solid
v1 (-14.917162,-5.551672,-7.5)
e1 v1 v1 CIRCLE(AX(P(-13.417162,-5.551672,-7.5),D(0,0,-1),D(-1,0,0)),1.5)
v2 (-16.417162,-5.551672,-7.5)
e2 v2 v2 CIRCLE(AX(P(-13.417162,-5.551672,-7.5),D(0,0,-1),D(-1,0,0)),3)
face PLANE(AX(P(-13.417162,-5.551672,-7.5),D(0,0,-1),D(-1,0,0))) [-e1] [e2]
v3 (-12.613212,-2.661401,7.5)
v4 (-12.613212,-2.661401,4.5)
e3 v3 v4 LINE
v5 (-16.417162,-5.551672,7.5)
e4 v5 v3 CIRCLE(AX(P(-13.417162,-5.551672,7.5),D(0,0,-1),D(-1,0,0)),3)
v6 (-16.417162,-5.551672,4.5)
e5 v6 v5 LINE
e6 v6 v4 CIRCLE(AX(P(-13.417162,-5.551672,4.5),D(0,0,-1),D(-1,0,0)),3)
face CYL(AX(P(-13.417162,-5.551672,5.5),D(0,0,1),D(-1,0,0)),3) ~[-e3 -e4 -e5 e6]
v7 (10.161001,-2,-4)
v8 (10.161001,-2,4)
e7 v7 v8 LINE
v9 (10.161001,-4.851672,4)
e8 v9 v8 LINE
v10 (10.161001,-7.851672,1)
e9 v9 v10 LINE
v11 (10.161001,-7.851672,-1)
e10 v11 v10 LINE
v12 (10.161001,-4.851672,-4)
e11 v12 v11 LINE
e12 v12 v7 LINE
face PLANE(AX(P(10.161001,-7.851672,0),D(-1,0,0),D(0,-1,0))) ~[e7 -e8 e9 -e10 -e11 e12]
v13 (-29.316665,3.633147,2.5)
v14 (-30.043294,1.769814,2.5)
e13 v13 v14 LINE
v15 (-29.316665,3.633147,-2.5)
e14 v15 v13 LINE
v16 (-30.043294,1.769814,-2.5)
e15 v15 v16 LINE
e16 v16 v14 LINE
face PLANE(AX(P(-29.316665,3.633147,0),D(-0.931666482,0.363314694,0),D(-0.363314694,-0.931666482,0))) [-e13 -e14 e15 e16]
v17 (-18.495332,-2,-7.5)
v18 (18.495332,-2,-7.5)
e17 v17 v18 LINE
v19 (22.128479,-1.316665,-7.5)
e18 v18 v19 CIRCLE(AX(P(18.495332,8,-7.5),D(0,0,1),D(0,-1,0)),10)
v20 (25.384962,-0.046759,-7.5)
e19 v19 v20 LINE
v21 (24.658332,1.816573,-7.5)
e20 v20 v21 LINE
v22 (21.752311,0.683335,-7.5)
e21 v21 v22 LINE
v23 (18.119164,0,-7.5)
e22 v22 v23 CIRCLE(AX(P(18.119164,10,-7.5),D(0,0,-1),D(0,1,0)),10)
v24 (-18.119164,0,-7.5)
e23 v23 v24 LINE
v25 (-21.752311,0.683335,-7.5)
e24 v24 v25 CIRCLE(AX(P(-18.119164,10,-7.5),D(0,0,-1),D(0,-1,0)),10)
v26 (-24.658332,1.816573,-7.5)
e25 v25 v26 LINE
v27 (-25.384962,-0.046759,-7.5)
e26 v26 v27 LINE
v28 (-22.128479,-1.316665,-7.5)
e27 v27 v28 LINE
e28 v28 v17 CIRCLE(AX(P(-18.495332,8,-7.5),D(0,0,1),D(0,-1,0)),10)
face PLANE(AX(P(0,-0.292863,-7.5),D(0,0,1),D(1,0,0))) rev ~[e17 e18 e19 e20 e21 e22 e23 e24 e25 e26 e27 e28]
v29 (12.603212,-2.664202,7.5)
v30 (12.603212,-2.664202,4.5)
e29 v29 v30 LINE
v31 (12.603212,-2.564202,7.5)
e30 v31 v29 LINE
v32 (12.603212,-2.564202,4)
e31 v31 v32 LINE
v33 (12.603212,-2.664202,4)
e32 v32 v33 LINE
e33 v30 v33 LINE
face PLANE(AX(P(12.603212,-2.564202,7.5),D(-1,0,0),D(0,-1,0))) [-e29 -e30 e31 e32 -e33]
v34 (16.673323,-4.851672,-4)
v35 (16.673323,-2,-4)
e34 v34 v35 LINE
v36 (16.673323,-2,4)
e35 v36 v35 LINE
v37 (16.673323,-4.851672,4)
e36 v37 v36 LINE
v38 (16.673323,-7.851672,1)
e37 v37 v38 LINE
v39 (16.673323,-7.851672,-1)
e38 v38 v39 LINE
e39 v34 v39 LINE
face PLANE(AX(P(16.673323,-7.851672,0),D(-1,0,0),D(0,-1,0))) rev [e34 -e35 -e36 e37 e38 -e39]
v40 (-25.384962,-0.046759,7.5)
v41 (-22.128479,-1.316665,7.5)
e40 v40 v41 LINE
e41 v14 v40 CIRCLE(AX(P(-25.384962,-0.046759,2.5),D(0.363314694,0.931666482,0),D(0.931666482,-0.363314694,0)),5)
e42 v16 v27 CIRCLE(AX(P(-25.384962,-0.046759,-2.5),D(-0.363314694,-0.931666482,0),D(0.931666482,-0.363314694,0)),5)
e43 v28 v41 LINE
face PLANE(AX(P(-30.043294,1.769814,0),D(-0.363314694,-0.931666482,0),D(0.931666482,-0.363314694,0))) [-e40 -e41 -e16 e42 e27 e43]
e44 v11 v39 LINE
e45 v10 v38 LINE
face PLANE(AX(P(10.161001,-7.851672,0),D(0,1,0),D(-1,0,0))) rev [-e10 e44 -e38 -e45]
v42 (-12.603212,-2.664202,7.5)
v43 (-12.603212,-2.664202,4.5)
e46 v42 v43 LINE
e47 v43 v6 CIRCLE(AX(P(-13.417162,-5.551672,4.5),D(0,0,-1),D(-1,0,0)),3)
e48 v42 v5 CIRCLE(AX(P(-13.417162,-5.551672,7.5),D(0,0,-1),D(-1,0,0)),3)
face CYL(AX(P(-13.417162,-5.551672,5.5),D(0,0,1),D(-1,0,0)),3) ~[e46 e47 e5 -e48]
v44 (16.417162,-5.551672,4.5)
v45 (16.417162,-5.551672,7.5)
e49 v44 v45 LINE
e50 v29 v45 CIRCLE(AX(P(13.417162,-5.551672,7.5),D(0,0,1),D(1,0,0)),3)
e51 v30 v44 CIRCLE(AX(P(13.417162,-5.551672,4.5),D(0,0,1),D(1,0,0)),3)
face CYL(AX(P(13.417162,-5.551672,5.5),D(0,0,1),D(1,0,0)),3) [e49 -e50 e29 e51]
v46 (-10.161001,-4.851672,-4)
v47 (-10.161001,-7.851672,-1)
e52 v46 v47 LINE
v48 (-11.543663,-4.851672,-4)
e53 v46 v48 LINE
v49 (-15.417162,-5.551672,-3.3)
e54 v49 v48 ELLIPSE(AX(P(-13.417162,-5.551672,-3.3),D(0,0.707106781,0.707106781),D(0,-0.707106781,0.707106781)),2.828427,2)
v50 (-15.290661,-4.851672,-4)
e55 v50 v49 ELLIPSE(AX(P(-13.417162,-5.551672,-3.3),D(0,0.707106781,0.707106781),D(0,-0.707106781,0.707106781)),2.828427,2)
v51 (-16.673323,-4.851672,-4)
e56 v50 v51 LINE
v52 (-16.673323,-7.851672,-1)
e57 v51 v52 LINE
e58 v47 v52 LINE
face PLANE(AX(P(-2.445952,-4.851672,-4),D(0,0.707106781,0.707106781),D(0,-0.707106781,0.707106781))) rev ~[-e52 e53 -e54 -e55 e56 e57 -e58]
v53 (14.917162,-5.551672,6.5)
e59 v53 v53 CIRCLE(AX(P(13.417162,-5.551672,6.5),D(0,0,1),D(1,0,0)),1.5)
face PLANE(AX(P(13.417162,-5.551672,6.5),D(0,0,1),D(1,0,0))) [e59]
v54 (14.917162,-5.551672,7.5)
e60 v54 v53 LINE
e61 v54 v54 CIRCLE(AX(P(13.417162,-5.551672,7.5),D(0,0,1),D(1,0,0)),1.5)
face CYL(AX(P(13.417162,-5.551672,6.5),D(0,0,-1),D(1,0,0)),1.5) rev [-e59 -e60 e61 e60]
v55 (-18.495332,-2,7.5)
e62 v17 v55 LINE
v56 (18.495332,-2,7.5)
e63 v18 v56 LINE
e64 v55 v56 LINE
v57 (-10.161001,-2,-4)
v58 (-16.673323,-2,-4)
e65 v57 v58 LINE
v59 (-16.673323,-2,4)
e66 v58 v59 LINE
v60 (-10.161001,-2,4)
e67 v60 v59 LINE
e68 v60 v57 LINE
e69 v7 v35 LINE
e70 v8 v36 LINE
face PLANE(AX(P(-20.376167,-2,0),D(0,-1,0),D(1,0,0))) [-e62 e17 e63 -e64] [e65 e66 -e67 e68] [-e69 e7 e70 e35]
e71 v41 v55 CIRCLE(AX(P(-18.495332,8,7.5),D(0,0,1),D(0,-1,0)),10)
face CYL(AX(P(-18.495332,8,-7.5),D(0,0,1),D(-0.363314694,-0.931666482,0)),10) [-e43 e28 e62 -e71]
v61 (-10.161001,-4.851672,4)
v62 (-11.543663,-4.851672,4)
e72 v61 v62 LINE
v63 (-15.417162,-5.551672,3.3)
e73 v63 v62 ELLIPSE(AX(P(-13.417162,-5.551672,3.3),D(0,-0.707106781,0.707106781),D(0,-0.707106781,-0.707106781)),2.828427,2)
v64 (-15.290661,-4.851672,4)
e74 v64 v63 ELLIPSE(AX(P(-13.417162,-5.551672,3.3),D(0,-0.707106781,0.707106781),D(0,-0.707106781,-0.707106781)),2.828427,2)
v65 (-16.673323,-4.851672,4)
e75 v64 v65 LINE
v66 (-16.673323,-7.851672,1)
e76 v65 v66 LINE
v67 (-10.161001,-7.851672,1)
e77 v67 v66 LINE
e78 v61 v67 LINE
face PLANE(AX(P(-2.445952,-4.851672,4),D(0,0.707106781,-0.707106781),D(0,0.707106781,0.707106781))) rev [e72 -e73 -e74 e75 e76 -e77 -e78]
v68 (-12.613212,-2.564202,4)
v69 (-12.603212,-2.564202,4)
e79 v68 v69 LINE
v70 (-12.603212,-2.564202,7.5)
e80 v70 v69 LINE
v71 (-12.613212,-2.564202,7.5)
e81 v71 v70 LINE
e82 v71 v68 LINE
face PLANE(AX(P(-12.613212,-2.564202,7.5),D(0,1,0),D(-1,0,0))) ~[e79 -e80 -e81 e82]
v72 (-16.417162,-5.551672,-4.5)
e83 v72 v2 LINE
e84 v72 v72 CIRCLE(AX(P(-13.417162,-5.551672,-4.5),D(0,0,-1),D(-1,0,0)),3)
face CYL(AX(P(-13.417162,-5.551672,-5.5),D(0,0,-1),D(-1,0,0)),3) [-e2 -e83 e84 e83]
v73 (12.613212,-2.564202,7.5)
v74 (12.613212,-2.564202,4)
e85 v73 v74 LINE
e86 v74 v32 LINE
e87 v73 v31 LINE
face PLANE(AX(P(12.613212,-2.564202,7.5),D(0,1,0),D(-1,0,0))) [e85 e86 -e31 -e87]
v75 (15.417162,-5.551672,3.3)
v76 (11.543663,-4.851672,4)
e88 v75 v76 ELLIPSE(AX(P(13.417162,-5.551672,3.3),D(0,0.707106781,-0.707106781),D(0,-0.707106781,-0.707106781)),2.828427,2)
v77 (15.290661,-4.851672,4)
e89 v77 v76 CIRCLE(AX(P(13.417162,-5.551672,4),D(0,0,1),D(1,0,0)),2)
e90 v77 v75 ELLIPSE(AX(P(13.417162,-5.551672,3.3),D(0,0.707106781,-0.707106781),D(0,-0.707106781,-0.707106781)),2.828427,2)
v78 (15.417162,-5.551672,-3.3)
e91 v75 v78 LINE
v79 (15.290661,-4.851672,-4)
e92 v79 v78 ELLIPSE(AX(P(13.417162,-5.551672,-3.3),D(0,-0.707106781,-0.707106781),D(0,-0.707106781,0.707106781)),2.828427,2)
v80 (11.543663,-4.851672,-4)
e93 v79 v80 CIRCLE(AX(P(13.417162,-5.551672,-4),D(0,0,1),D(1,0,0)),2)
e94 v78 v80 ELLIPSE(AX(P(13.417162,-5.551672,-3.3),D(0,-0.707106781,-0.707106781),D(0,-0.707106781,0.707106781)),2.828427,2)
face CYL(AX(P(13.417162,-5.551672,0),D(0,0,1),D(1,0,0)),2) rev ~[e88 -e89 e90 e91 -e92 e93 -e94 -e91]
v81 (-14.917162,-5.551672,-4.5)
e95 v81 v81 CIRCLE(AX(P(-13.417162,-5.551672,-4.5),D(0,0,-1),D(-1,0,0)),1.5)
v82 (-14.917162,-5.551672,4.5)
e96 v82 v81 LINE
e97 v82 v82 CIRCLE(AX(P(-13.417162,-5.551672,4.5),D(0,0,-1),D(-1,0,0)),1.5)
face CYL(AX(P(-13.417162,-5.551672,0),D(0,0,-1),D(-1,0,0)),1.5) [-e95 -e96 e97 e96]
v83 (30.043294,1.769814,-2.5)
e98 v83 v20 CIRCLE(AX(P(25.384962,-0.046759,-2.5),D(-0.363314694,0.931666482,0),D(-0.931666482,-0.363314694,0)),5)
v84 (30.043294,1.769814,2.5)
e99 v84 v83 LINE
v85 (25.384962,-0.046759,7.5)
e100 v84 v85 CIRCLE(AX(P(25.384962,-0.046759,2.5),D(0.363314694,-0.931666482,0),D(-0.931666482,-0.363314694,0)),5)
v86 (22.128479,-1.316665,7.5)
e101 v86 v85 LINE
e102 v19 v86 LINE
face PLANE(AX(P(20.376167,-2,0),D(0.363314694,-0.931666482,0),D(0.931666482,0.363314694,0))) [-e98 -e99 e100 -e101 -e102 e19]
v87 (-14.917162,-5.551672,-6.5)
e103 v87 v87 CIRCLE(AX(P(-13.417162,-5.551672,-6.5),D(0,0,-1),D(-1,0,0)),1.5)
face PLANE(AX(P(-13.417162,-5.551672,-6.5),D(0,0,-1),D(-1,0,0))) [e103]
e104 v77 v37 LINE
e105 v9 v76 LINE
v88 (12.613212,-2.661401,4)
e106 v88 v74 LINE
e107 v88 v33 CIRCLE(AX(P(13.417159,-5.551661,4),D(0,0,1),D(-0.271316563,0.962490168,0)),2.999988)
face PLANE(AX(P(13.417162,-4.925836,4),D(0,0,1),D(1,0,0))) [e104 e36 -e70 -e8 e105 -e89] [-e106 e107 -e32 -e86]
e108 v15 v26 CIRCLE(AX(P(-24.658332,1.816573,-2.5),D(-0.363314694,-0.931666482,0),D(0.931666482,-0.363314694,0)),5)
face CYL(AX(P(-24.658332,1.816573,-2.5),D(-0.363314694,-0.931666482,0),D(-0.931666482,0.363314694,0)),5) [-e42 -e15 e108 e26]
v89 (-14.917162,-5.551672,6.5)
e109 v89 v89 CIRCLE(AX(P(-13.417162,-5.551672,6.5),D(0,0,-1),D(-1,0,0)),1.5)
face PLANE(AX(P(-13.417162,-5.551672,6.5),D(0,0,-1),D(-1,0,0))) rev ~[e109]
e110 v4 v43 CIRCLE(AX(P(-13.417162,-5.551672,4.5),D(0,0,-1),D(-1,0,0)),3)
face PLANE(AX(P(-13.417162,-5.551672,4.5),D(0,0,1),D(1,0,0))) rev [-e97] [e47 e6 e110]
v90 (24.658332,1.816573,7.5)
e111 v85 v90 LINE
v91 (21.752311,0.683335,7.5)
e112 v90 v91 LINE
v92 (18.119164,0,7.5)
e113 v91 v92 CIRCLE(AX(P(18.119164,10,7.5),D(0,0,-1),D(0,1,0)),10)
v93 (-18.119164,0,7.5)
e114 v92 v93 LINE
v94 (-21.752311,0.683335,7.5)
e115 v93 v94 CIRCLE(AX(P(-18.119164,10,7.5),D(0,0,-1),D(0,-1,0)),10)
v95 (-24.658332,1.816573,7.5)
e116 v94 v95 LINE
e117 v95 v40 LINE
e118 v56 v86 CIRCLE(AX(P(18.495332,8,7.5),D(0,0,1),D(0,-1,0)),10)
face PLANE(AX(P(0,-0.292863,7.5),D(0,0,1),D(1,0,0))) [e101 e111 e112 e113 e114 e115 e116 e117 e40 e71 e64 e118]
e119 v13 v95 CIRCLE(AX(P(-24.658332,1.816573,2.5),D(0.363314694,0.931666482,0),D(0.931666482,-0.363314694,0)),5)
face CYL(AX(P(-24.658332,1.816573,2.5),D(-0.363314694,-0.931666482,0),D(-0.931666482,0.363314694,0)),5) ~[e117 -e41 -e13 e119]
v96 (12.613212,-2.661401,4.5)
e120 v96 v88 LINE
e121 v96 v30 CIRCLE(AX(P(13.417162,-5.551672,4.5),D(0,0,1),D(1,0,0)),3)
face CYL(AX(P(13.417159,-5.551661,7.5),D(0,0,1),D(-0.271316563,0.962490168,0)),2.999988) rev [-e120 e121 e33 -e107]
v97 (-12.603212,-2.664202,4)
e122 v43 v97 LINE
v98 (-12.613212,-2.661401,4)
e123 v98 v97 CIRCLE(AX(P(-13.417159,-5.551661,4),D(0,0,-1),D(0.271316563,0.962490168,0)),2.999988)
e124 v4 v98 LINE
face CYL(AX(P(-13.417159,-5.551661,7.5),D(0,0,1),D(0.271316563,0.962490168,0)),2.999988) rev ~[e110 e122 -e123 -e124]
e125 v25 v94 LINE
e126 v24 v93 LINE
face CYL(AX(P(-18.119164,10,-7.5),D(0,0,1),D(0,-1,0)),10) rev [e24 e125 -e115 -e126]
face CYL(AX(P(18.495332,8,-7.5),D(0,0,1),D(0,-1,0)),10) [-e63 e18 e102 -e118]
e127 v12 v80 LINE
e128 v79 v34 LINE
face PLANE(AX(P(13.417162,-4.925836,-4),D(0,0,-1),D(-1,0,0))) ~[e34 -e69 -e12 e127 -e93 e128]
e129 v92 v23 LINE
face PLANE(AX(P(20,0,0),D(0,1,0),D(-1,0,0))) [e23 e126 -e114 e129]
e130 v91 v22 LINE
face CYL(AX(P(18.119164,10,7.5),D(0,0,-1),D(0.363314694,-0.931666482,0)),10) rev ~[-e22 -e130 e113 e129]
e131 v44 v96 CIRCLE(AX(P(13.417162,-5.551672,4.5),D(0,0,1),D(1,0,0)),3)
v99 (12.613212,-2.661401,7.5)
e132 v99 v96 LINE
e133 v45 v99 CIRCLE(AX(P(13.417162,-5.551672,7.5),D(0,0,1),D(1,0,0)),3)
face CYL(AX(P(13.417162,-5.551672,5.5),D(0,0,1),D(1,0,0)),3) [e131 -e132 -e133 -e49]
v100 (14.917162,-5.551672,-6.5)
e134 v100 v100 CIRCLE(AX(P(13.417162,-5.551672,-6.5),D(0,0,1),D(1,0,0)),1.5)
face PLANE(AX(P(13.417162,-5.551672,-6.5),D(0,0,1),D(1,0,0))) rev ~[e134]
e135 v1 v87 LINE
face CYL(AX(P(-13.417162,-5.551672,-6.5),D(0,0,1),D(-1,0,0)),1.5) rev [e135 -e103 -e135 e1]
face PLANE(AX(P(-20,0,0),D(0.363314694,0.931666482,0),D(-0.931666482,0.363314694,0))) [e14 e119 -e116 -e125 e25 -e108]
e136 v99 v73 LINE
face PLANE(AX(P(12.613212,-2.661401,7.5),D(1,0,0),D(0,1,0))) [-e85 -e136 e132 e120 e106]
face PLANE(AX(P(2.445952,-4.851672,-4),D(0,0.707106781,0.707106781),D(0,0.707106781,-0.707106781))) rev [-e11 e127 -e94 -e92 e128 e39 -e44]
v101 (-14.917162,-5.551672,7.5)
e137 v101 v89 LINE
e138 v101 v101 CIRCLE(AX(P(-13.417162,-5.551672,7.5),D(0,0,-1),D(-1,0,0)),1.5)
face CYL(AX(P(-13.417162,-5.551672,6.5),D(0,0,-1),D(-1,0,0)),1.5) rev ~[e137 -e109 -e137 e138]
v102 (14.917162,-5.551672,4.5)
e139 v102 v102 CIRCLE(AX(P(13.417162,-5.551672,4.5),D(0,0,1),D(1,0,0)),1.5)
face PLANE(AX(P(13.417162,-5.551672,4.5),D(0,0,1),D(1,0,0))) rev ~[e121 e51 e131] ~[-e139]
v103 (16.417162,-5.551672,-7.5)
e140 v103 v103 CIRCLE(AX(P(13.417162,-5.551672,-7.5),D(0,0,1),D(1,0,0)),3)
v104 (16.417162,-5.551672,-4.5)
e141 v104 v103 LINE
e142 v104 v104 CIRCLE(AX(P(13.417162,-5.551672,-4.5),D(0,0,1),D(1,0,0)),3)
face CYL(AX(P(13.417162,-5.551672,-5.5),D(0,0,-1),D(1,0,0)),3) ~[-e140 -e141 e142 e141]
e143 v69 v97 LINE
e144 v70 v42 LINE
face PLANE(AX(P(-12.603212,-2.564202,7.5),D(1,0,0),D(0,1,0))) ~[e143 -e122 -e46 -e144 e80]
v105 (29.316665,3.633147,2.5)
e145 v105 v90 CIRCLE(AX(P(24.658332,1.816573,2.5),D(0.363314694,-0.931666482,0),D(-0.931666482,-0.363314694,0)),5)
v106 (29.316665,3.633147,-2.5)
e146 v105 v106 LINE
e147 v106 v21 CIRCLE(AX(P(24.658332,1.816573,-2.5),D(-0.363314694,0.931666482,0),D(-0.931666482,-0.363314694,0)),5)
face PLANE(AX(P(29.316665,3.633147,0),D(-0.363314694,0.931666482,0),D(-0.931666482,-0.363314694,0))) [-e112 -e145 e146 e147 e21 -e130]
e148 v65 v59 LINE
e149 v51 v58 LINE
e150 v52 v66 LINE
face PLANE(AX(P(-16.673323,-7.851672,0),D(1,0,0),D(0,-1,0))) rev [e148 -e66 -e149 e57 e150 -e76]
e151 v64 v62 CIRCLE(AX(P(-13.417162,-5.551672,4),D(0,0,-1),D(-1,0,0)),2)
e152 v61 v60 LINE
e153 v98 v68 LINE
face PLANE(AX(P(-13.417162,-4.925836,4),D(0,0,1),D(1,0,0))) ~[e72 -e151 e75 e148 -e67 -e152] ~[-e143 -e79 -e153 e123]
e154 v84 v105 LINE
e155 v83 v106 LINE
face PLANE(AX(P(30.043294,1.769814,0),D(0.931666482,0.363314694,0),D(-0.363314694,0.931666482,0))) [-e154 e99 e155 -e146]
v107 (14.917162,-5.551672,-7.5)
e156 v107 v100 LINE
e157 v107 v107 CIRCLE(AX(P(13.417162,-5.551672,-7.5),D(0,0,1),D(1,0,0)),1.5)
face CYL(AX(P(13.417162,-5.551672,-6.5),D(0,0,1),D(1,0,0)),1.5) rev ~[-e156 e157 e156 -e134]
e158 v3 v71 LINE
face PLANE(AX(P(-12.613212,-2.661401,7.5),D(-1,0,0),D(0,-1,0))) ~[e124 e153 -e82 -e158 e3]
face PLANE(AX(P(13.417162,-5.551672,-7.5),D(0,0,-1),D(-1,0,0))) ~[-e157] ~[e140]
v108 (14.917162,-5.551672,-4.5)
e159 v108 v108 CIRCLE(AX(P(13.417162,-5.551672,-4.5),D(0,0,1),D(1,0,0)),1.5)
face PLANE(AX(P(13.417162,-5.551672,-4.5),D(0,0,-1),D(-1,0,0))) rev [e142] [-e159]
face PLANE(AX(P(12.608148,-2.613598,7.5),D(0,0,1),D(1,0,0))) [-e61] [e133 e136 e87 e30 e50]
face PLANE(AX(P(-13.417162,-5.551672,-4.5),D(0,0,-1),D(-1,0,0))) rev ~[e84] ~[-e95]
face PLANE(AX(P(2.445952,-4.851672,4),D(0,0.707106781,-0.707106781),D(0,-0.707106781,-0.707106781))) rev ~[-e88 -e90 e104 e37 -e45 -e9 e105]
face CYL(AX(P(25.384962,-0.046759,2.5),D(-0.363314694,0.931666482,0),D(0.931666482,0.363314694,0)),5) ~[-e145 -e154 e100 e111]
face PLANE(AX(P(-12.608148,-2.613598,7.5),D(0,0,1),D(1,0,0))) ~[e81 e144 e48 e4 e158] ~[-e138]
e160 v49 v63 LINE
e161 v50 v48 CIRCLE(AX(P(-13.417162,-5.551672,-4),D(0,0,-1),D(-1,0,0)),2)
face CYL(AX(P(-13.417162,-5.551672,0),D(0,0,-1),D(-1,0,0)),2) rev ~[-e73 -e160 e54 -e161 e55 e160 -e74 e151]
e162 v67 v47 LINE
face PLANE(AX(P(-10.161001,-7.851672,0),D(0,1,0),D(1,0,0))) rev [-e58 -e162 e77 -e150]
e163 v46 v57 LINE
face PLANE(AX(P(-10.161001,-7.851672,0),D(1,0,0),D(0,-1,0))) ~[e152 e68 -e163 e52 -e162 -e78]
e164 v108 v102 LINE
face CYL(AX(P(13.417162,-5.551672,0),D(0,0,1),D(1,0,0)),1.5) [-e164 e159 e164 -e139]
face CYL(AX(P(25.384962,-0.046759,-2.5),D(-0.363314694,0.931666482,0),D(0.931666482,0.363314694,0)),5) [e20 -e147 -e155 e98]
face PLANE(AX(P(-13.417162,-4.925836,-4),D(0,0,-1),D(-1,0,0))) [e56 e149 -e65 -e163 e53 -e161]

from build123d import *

# Parameters (mm, degrees)
F1_DEPTH    = 7.5
F2_R        = 5
F3_R        = 10
F4_W        = 6.5123213332
F4_H        = 5.8516720749
F4_R        = 2
F5_DEPTH    = 4
F4_R_2      = 1.5
F6_DEPTH    = 6.5
F7_T1_DEPTH = 21.942419261
F8_R        = 3
F8_R_2      = 1.5
F9_DEPTH    = 1
F10_DEPTH   = 1
F14_DEPTH   = 5


# Not quite as in the source:
# - a fillet or chamfer that OpenCascade refuses, or shapes differently, is made with other operations: its cross-section is extruded or revolved along the edge and cut away or added


with BuildPart() as f1:
    # F0 (on Top) → F1 (new body, symmetric)
    with BuildSketch(Plane.XY):
        Polygon((20, 0), (0, 0), (-20, 0), (-29.3166648167, 3.6331469407), (-30.0432942049, 1.7698139773), (-20.3761671049, -2), (0, -2), (20.3761671049, -2), (30.0432942049, 1.7698139773), (29.3166648167, 3.6331469407), align=None)
    extrude(amount=F1_DEPTH, both=True)

    # F2
    f2_edges = [f1.edges().sort_by_distance(p)[0] for p in [
        (29.67998, 2.70148, 7.5),
        (29.67998, 2.70148, -7.5),
        (-29.67998, 2.70148, 7.5),
        (-29.67998, 2.70148, -7.5),
    ]]
    fillet(f2_edges, radius=F2_R)

    # F3
    f3_edges = [f1.edges().sort_by_distance(p)[0] for p in [
        (20, 0, 0),
        (-20, 0, 0),
        (-20.376167, -2, 0),
        (20.376167, -2, 0),
    ]]
    fillet(f3_edges, radius=F3_R)

    # F4 (on Top) → F5 (join)
    with BuildSketch(Plane.XY):
        with Locations((13.4171620011, -4.9258360375)):
            Rectangle(F4_W, F4_H)
        with Locations((13.4171620011, -5.5516720749)):
            Circle(F4_R, mode=Mode.SUBTRACT)
    extrude(amount=F5_DEPTH)

    # F7: chamfer of 3 on 1 edges, made by hand

    # F7_s2 → F7_t1 (cut)
    with BuildSketch(Plane.YZ.offset(2.4459523706)):
        Polygon((-4.8516720749, 4), (-7.8516720749, 1), (-7.8516720749, 4), align=None)
    extrude(amount=F7_T1_DEPTH, mode=Mode.SUBTRACT)


with BuildPart() as f6:
    # F4 (on Top) → F6 (new body, symmetric)
    with BuildSketch(Plane.XY):
        with Locations((13.4171620011, -5.5516720749)):
            Circle(F4_R_2)
    extrude(amount=F6_DEPTH, both=True)

    # F8 (on face) → F9 (join, symmetric)
    with BuildSketch(Plane.XY.offset(6.5)):
        with Locations((13.4171620011, -5.5516720749)):
            Circle(F8_R)
        with Locations((13.4171620011, -5.5516720749)):
            Circle(F8_R_2, mode=Mode.SUBTRACT)
    extrude(amount=F9_DEPTH, both=True)

    # F10 (add): a face of the model
    f10_faces = [f6.faces().sort_by_distance(p)[0] for p in [
        (10.5020148149, -5.5516720749, 5.5),
    ]]
    extrude(f10_faces, amount=F10_DEPTH)


with BuildPart() as f11_1:
    # F11: instance of F1
    add(f1.part.mirror(Plane.XY))


with BuildPart() as f11_2:
    # F11: instance of F6
    add(f6.part.mirror(Plane.XY))


with BuildPart() as f1_1:
    add(f1.part)

    add(f11_1.part)  # F12 merges F11_1
    # F12: F11_2, F11_1, F6, F1 across plane
    add(f11_2.part.mirror(Plane.YZ))
    add(f11_1.part.mirror(Plane.YZ))
    add(f6.part.mirror(Plane.YZ))
    add(f1.part.mirror(Plane.YZ))

    add(f6.part)  # F14 merges F6
    # F13 (on face) → F14 (join)
    with BuildSketch(Plane.XY.offset(7.5)):
        with BuildLine():
            Line((12.6132123219, -2.5642015695), (12.6032123219, -2.5642015695))
            Line((12.6032123219, -2.5642015695), (12.6032123219, -2.6642015695))
            ThreePointArc((12.6032123219, -2.6642015695), (12.6082111102, -2.6627971285), (12.6132123219, -2.6614013414))
            Line((12.6132123219, -2.6614013414), (12.6132123219, -2.5642015695))
        make_face()
    extrude(amount=-F14_DEPTH)



with BuildPart() as f1_2:
    add(f1_1.part)

    add(f11_2.part)  # F15 merges F11_2
    # F15: F1 across plane
    add(f1_1.part.mirror(Plane.YZ))

    # F16: union 


solid = f1_2.part
